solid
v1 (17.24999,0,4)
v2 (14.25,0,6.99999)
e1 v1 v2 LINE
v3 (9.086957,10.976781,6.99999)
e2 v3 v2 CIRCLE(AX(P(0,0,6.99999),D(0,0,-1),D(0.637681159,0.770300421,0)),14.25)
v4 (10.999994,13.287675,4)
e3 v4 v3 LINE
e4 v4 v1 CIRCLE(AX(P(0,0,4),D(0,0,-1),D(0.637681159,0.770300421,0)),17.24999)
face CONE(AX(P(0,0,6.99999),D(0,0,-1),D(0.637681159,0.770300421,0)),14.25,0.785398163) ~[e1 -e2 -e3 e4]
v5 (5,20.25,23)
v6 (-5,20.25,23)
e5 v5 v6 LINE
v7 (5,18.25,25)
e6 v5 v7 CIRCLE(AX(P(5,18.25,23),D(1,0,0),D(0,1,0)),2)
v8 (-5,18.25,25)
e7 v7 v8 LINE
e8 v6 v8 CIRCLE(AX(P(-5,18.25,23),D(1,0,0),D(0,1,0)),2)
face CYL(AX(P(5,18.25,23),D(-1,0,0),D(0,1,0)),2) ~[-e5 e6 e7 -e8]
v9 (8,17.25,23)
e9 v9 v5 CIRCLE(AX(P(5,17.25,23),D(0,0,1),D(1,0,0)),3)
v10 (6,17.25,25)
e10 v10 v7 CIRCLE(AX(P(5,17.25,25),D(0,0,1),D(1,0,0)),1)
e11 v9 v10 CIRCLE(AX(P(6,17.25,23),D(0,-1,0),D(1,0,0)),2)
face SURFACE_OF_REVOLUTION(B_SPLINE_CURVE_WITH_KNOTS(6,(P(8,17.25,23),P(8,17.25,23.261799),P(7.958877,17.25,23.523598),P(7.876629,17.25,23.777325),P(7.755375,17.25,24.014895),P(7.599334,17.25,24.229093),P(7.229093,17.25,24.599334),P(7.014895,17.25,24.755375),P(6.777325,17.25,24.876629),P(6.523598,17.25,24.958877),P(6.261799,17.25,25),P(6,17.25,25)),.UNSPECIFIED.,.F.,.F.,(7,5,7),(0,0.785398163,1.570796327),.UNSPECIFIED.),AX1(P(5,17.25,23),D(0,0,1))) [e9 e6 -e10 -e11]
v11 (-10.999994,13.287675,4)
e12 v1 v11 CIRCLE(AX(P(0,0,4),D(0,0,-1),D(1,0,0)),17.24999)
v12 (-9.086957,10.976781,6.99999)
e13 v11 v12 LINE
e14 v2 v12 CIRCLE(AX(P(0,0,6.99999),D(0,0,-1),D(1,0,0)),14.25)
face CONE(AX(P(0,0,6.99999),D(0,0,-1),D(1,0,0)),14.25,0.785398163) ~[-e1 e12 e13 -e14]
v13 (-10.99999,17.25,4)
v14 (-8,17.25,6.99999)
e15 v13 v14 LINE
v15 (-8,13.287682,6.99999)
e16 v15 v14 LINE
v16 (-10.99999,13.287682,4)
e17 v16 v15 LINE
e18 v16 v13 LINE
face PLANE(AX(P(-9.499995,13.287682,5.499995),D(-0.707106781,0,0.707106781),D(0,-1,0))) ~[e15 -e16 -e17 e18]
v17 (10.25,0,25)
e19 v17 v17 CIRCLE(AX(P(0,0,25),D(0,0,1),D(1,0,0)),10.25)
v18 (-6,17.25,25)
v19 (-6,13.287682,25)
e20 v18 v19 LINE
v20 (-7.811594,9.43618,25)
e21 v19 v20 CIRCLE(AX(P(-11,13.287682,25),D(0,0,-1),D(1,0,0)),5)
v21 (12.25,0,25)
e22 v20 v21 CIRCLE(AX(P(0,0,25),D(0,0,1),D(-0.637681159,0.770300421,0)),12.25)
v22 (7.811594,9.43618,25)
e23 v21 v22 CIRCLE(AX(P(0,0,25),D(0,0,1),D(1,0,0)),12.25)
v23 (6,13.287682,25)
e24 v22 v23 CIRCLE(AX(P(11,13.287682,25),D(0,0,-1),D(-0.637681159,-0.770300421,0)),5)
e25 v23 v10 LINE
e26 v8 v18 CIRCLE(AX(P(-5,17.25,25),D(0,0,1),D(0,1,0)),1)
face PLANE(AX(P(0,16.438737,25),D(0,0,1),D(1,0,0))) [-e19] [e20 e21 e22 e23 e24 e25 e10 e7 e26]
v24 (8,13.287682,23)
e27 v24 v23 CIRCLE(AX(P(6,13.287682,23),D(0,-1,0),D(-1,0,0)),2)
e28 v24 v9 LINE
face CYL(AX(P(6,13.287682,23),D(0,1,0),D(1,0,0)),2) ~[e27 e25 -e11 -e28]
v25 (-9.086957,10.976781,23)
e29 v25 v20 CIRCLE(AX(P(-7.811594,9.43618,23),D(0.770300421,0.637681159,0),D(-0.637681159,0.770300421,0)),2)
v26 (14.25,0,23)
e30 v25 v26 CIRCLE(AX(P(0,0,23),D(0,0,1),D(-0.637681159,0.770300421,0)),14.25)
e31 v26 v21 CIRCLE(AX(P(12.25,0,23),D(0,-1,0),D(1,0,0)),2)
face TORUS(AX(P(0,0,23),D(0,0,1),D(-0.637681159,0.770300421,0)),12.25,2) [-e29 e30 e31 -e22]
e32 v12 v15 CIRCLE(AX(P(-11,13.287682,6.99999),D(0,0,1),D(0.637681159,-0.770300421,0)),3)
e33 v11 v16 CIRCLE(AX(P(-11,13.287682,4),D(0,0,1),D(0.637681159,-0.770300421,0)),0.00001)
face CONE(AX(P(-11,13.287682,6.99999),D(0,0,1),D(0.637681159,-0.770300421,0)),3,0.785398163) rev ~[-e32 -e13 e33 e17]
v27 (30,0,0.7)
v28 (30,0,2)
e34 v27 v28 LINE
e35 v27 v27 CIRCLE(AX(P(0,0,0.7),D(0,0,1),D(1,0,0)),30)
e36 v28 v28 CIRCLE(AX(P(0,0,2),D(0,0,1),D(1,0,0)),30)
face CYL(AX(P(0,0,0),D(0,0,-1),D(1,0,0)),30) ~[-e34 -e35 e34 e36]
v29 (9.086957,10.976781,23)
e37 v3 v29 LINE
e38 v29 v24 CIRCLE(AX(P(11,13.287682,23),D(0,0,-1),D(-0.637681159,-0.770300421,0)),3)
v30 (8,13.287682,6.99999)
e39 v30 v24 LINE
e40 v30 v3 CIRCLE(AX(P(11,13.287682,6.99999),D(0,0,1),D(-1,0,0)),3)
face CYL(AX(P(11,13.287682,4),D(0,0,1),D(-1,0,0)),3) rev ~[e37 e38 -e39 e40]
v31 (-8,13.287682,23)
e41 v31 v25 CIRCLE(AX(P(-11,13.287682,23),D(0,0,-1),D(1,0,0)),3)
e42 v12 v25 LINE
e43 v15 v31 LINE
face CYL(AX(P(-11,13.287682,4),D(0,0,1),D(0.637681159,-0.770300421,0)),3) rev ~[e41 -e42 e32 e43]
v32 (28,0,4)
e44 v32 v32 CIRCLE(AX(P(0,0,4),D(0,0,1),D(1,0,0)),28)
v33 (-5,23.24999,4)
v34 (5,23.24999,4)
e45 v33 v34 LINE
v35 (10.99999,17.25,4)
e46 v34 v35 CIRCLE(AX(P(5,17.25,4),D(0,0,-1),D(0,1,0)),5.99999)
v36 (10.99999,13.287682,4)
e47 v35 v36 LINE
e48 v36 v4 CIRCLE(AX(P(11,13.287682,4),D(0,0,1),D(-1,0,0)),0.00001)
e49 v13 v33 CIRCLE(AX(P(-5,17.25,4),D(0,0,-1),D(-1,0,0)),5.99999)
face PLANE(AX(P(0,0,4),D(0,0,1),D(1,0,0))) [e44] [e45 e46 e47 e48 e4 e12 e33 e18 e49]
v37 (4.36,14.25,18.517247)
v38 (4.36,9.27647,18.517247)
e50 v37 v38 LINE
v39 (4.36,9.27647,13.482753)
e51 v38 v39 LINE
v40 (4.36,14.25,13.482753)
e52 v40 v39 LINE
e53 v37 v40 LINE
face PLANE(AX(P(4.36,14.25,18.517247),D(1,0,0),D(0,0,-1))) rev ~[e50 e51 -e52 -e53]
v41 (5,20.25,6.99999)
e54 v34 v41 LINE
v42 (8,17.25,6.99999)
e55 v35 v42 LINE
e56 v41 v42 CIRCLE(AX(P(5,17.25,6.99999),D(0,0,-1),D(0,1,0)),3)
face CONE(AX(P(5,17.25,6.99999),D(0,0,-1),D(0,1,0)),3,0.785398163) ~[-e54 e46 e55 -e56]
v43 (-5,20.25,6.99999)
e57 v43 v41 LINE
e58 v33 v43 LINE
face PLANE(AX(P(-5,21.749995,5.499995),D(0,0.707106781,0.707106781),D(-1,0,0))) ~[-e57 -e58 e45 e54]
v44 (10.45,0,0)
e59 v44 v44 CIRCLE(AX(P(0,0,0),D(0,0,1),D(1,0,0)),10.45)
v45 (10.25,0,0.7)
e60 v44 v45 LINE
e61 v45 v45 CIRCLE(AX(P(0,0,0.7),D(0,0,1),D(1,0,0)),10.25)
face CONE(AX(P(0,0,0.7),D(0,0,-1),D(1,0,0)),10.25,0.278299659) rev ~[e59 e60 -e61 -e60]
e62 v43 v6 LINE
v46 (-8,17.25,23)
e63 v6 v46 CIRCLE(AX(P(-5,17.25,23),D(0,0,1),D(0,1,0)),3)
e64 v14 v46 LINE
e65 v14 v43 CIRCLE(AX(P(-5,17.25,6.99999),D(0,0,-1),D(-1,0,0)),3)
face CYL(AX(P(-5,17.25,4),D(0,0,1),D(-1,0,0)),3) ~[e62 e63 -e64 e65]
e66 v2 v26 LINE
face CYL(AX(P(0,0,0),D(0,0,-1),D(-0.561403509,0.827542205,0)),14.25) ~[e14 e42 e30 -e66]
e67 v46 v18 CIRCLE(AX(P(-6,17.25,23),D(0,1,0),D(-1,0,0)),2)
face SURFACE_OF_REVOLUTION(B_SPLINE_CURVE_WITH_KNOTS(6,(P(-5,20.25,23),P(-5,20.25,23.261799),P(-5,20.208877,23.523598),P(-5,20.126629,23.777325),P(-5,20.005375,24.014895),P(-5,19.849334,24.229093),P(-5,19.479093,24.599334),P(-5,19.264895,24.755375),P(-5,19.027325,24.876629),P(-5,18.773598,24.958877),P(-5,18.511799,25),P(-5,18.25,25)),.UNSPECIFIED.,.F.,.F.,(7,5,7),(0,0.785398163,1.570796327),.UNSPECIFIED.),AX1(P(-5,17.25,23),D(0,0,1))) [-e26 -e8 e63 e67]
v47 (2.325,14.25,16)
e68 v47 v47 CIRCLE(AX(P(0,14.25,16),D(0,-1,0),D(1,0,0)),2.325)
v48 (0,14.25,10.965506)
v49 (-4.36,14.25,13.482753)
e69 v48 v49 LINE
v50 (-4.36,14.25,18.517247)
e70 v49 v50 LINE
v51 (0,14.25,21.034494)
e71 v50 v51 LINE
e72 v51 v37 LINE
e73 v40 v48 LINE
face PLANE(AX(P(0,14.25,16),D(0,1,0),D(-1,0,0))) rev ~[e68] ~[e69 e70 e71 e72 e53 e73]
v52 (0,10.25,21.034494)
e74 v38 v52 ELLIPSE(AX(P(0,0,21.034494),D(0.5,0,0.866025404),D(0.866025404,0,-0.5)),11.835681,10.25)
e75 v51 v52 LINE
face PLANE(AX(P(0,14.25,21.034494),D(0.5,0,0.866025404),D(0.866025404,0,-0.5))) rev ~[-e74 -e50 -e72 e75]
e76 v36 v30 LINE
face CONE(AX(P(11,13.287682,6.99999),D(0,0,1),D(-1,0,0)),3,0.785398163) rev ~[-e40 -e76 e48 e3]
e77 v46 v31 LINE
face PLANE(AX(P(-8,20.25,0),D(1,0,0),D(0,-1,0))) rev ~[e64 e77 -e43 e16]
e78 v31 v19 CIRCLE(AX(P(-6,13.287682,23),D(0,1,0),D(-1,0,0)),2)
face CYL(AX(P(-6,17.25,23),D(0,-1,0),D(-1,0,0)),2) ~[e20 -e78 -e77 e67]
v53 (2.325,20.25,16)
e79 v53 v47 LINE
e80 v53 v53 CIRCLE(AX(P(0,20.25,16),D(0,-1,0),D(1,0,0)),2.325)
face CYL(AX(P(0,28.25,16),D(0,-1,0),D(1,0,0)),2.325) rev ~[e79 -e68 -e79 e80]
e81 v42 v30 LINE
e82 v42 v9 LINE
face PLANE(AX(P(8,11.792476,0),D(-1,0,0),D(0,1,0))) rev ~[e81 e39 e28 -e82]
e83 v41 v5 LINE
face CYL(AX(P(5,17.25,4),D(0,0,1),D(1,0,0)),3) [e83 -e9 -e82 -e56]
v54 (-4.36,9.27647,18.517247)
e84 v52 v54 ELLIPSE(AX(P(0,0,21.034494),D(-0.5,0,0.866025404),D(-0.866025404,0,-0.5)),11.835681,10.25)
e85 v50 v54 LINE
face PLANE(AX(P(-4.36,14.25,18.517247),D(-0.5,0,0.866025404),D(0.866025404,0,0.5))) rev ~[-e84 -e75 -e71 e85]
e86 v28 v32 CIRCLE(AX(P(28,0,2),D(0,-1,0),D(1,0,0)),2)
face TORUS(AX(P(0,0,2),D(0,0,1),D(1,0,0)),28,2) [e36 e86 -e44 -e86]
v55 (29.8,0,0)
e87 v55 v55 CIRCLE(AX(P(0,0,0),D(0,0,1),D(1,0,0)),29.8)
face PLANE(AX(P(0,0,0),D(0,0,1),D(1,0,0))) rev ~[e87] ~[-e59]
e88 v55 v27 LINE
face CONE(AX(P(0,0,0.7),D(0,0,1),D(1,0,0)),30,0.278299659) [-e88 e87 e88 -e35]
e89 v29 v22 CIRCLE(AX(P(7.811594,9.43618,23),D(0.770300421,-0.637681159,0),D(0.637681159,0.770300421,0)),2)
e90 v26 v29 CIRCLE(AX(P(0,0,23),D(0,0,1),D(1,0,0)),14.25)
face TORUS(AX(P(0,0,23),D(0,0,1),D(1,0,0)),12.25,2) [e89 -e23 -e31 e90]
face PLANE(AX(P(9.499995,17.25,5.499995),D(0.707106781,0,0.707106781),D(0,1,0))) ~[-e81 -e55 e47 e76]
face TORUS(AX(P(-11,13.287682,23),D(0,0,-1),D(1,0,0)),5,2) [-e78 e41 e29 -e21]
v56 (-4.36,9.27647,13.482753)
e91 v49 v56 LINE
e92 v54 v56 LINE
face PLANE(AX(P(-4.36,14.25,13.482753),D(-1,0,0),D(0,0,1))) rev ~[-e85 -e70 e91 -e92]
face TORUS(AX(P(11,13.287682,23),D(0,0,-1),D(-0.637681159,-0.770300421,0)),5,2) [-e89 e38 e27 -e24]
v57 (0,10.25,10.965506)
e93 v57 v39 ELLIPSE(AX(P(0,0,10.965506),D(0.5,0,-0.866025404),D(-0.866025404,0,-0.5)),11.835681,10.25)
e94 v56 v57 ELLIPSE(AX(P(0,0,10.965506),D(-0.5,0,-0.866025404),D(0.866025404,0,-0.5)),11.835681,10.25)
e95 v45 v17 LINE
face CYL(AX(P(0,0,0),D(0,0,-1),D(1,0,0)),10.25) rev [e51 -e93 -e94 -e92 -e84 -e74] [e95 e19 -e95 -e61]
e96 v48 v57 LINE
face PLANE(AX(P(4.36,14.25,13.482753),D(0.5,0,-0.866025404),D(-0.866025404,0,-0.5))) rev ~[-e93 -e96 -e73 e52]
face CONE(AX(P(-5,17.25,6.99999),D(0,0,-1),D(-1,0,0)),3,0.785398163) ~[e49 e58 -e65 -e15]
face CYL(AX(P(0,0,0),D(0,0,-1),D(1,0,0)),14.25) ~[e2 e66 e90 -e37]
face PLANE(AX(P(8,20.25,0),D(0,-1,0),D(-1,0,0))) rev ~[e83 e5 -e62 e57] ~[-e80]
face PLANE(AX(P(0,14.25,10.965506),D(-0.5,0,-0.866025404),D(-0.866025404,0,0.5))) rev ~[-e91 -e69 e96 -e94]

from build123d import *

# Parameters (mm, degrees)
F0_R     = 30
F0_R_2   = 10.25
F1_DEPTH = 4
F2_DEPTH = 25
F3_R     = 3
F4_SIZE  = 2.99999
F6_SIZE2 = 0.7
F6_SIZE  = 0.2
F7_START = -6
F7_DEPTH = 19
F8_D     = 4.65
F8_DEPTH = 8
F8_TIP   = 1.3970009392
F9_R     = 2


# Not quite as in the source:
# - a fillet or chamfer is up to 0.001 mm smaller than in the source, because OpenCascade refuses the exact size


with BuildPart() as f1:
    # F0 (on Top) → F1 (new body)
    with BuildSketch(Plane.XY):
        Circle(F0_R)
        with BuildLine():
            ThreePointArc((8, 11.7924764151), (12.5909193469, 6.6731739075), (14.25, 0))
            ThreePointArc((14.25, 0), (-6.6731739075, -12.5909193469), (-8, 11.7924764151))
            Line((-8, 11.7924764151), (-8, 20.25))
            Line((-8, 20.25), (8, 20.25))
            Line((8, 20.25), (8, 11.7924764151))
        make_face(mode=Mode.SUBTRACT)
        with BuildLine():
            ThreePointArc((-8, 11.7924764151), (0, 14.25), (8, 11.7924764151))
            Line((8, 11.7924764151), (8, 20.25))
            Line((8, 20.25), (-8, 20.25))
            Line((-8, 20.25), (-8, 11.7924764151))
        make_face()
        with BuildLine():
            ThreePointArc((-8, 11.7924764151), (-6.6731739075, -12.5909193469), (14.25, 0))
            ThreePointArc((14.25, 0), (12.5909193469, 6.6731739075), (8, 11.7924764151))
            ThreePointArc((8, 11.7924764151), (0, 14.25), (-8, 11.7924764151))
        make_face()
        Circle(F0_R_2, mode=Mode.SUBTRACT)
    extrude(amount=F1_DEPTH)

    # F0 (on Top) → F2 (join)
    with BuildSketch(Plane.XY):
        with BuildLine():
            ThreePointArc((-8, 11.7924764151), (0, 14.25), (8, 11.7924764151))
            Line((8, 11.7924764151), (8, 20.25))
            Line((8, 20.25), (-8, 20.25))
            Line((-8, 20.25), (-8, 11.7924764151))
        make_face()
        with BuildLine():
            ThreePointArc((-8, 11.7924764151), (-6.6731739075, -12.5909193469), (14.25, 0))
            ThreePointArc((14.25, 0), (12.5909193469, 6.6731739075), (8, 11.7924764151))
            ThreePointArc((8, 11.7924764151), (0, 14.25), (-8, 11.7924764151))
        make_face()
        Circle(F0_R_2, mode=Mode.SUBTRACT)
    extrude(amount=F2_DEPTH)

    # F3
    f3_edges = [f1.edges().sort_by_distance(p)[0] for p in [
        (-8, 11.792476, 14.5),
        (8, 11.792476, 14.5),
        (8, 20.25, 14.5),
        (-8, 20.25, 14.5),
    ]]
    fillet(f3_edges, radius=F3_R)

    # F4 (size 3 in the source; OpenCascade refuses exactly that, so slightly less here)
    f4_edges = [f1.edges().sort_by_distance(p)[0] for p in [
        (0, -14.25, 4),
        (-8, 15.268841, 4),
        (8, 15.268841, 4),
    ]]
    chamfer(f4_edges, length=F4_SIZE)

    # F6
    f6_edges = [f1.edges().sort_by_distance(p)[0] for p in [
        (-10.25, 0, 0),
        (-30, 0, 0),
    ]]
    f6_side = f1.faces().sort_by_distance((-29.151472, 0, 0))[0]
    chamfer(f6_edges, length=F6_SIZE, length2=F6_SIZE2, reference=f6_side)

    # F5 (on face) → F7 (cut)
    with BuildSketch(Plane(origin=(0, 20.25, 0), x_dir=(-1, 0, 0), z_dir=(0, 1, 0)).offset(F7_START)):
        Polygon((-4.36, 18.5172471737), (-4.36, 13.4827528263), (0, 10.9655056527), (4.36, 13.4827528263), (4.36, 18.5172471737), (0, 21.0344943473), align=None)
    extrude(amount=-F7_DEPTH, mode=Mode.SUBTRACT)

    # F8
    with Locations(Plane(origin=(0, 20.25, 0), x_dir=(-1, 0, 0), z_dir=(0, 1, 0))):
        with Locations((0, 16)):
            Hole(F8_D / 2, depth=F8_DEPTH)
            with Locations((0, 0, -(F8_DEPTH + F8_TIP / 2))):  # 118° drill point
                Cone(0, F8_D / 2, F8_TIP, mode=Mode.SUBTRACT)

    # F9
    f9_edges = [f1.edges().sort_by_distance(p)[0] for p in [
        (-30, 0, 4),
        (0, -14.25, 25),
    ]]
    fillet(f9_edges, radius=F9_R)


solid = f1.part
